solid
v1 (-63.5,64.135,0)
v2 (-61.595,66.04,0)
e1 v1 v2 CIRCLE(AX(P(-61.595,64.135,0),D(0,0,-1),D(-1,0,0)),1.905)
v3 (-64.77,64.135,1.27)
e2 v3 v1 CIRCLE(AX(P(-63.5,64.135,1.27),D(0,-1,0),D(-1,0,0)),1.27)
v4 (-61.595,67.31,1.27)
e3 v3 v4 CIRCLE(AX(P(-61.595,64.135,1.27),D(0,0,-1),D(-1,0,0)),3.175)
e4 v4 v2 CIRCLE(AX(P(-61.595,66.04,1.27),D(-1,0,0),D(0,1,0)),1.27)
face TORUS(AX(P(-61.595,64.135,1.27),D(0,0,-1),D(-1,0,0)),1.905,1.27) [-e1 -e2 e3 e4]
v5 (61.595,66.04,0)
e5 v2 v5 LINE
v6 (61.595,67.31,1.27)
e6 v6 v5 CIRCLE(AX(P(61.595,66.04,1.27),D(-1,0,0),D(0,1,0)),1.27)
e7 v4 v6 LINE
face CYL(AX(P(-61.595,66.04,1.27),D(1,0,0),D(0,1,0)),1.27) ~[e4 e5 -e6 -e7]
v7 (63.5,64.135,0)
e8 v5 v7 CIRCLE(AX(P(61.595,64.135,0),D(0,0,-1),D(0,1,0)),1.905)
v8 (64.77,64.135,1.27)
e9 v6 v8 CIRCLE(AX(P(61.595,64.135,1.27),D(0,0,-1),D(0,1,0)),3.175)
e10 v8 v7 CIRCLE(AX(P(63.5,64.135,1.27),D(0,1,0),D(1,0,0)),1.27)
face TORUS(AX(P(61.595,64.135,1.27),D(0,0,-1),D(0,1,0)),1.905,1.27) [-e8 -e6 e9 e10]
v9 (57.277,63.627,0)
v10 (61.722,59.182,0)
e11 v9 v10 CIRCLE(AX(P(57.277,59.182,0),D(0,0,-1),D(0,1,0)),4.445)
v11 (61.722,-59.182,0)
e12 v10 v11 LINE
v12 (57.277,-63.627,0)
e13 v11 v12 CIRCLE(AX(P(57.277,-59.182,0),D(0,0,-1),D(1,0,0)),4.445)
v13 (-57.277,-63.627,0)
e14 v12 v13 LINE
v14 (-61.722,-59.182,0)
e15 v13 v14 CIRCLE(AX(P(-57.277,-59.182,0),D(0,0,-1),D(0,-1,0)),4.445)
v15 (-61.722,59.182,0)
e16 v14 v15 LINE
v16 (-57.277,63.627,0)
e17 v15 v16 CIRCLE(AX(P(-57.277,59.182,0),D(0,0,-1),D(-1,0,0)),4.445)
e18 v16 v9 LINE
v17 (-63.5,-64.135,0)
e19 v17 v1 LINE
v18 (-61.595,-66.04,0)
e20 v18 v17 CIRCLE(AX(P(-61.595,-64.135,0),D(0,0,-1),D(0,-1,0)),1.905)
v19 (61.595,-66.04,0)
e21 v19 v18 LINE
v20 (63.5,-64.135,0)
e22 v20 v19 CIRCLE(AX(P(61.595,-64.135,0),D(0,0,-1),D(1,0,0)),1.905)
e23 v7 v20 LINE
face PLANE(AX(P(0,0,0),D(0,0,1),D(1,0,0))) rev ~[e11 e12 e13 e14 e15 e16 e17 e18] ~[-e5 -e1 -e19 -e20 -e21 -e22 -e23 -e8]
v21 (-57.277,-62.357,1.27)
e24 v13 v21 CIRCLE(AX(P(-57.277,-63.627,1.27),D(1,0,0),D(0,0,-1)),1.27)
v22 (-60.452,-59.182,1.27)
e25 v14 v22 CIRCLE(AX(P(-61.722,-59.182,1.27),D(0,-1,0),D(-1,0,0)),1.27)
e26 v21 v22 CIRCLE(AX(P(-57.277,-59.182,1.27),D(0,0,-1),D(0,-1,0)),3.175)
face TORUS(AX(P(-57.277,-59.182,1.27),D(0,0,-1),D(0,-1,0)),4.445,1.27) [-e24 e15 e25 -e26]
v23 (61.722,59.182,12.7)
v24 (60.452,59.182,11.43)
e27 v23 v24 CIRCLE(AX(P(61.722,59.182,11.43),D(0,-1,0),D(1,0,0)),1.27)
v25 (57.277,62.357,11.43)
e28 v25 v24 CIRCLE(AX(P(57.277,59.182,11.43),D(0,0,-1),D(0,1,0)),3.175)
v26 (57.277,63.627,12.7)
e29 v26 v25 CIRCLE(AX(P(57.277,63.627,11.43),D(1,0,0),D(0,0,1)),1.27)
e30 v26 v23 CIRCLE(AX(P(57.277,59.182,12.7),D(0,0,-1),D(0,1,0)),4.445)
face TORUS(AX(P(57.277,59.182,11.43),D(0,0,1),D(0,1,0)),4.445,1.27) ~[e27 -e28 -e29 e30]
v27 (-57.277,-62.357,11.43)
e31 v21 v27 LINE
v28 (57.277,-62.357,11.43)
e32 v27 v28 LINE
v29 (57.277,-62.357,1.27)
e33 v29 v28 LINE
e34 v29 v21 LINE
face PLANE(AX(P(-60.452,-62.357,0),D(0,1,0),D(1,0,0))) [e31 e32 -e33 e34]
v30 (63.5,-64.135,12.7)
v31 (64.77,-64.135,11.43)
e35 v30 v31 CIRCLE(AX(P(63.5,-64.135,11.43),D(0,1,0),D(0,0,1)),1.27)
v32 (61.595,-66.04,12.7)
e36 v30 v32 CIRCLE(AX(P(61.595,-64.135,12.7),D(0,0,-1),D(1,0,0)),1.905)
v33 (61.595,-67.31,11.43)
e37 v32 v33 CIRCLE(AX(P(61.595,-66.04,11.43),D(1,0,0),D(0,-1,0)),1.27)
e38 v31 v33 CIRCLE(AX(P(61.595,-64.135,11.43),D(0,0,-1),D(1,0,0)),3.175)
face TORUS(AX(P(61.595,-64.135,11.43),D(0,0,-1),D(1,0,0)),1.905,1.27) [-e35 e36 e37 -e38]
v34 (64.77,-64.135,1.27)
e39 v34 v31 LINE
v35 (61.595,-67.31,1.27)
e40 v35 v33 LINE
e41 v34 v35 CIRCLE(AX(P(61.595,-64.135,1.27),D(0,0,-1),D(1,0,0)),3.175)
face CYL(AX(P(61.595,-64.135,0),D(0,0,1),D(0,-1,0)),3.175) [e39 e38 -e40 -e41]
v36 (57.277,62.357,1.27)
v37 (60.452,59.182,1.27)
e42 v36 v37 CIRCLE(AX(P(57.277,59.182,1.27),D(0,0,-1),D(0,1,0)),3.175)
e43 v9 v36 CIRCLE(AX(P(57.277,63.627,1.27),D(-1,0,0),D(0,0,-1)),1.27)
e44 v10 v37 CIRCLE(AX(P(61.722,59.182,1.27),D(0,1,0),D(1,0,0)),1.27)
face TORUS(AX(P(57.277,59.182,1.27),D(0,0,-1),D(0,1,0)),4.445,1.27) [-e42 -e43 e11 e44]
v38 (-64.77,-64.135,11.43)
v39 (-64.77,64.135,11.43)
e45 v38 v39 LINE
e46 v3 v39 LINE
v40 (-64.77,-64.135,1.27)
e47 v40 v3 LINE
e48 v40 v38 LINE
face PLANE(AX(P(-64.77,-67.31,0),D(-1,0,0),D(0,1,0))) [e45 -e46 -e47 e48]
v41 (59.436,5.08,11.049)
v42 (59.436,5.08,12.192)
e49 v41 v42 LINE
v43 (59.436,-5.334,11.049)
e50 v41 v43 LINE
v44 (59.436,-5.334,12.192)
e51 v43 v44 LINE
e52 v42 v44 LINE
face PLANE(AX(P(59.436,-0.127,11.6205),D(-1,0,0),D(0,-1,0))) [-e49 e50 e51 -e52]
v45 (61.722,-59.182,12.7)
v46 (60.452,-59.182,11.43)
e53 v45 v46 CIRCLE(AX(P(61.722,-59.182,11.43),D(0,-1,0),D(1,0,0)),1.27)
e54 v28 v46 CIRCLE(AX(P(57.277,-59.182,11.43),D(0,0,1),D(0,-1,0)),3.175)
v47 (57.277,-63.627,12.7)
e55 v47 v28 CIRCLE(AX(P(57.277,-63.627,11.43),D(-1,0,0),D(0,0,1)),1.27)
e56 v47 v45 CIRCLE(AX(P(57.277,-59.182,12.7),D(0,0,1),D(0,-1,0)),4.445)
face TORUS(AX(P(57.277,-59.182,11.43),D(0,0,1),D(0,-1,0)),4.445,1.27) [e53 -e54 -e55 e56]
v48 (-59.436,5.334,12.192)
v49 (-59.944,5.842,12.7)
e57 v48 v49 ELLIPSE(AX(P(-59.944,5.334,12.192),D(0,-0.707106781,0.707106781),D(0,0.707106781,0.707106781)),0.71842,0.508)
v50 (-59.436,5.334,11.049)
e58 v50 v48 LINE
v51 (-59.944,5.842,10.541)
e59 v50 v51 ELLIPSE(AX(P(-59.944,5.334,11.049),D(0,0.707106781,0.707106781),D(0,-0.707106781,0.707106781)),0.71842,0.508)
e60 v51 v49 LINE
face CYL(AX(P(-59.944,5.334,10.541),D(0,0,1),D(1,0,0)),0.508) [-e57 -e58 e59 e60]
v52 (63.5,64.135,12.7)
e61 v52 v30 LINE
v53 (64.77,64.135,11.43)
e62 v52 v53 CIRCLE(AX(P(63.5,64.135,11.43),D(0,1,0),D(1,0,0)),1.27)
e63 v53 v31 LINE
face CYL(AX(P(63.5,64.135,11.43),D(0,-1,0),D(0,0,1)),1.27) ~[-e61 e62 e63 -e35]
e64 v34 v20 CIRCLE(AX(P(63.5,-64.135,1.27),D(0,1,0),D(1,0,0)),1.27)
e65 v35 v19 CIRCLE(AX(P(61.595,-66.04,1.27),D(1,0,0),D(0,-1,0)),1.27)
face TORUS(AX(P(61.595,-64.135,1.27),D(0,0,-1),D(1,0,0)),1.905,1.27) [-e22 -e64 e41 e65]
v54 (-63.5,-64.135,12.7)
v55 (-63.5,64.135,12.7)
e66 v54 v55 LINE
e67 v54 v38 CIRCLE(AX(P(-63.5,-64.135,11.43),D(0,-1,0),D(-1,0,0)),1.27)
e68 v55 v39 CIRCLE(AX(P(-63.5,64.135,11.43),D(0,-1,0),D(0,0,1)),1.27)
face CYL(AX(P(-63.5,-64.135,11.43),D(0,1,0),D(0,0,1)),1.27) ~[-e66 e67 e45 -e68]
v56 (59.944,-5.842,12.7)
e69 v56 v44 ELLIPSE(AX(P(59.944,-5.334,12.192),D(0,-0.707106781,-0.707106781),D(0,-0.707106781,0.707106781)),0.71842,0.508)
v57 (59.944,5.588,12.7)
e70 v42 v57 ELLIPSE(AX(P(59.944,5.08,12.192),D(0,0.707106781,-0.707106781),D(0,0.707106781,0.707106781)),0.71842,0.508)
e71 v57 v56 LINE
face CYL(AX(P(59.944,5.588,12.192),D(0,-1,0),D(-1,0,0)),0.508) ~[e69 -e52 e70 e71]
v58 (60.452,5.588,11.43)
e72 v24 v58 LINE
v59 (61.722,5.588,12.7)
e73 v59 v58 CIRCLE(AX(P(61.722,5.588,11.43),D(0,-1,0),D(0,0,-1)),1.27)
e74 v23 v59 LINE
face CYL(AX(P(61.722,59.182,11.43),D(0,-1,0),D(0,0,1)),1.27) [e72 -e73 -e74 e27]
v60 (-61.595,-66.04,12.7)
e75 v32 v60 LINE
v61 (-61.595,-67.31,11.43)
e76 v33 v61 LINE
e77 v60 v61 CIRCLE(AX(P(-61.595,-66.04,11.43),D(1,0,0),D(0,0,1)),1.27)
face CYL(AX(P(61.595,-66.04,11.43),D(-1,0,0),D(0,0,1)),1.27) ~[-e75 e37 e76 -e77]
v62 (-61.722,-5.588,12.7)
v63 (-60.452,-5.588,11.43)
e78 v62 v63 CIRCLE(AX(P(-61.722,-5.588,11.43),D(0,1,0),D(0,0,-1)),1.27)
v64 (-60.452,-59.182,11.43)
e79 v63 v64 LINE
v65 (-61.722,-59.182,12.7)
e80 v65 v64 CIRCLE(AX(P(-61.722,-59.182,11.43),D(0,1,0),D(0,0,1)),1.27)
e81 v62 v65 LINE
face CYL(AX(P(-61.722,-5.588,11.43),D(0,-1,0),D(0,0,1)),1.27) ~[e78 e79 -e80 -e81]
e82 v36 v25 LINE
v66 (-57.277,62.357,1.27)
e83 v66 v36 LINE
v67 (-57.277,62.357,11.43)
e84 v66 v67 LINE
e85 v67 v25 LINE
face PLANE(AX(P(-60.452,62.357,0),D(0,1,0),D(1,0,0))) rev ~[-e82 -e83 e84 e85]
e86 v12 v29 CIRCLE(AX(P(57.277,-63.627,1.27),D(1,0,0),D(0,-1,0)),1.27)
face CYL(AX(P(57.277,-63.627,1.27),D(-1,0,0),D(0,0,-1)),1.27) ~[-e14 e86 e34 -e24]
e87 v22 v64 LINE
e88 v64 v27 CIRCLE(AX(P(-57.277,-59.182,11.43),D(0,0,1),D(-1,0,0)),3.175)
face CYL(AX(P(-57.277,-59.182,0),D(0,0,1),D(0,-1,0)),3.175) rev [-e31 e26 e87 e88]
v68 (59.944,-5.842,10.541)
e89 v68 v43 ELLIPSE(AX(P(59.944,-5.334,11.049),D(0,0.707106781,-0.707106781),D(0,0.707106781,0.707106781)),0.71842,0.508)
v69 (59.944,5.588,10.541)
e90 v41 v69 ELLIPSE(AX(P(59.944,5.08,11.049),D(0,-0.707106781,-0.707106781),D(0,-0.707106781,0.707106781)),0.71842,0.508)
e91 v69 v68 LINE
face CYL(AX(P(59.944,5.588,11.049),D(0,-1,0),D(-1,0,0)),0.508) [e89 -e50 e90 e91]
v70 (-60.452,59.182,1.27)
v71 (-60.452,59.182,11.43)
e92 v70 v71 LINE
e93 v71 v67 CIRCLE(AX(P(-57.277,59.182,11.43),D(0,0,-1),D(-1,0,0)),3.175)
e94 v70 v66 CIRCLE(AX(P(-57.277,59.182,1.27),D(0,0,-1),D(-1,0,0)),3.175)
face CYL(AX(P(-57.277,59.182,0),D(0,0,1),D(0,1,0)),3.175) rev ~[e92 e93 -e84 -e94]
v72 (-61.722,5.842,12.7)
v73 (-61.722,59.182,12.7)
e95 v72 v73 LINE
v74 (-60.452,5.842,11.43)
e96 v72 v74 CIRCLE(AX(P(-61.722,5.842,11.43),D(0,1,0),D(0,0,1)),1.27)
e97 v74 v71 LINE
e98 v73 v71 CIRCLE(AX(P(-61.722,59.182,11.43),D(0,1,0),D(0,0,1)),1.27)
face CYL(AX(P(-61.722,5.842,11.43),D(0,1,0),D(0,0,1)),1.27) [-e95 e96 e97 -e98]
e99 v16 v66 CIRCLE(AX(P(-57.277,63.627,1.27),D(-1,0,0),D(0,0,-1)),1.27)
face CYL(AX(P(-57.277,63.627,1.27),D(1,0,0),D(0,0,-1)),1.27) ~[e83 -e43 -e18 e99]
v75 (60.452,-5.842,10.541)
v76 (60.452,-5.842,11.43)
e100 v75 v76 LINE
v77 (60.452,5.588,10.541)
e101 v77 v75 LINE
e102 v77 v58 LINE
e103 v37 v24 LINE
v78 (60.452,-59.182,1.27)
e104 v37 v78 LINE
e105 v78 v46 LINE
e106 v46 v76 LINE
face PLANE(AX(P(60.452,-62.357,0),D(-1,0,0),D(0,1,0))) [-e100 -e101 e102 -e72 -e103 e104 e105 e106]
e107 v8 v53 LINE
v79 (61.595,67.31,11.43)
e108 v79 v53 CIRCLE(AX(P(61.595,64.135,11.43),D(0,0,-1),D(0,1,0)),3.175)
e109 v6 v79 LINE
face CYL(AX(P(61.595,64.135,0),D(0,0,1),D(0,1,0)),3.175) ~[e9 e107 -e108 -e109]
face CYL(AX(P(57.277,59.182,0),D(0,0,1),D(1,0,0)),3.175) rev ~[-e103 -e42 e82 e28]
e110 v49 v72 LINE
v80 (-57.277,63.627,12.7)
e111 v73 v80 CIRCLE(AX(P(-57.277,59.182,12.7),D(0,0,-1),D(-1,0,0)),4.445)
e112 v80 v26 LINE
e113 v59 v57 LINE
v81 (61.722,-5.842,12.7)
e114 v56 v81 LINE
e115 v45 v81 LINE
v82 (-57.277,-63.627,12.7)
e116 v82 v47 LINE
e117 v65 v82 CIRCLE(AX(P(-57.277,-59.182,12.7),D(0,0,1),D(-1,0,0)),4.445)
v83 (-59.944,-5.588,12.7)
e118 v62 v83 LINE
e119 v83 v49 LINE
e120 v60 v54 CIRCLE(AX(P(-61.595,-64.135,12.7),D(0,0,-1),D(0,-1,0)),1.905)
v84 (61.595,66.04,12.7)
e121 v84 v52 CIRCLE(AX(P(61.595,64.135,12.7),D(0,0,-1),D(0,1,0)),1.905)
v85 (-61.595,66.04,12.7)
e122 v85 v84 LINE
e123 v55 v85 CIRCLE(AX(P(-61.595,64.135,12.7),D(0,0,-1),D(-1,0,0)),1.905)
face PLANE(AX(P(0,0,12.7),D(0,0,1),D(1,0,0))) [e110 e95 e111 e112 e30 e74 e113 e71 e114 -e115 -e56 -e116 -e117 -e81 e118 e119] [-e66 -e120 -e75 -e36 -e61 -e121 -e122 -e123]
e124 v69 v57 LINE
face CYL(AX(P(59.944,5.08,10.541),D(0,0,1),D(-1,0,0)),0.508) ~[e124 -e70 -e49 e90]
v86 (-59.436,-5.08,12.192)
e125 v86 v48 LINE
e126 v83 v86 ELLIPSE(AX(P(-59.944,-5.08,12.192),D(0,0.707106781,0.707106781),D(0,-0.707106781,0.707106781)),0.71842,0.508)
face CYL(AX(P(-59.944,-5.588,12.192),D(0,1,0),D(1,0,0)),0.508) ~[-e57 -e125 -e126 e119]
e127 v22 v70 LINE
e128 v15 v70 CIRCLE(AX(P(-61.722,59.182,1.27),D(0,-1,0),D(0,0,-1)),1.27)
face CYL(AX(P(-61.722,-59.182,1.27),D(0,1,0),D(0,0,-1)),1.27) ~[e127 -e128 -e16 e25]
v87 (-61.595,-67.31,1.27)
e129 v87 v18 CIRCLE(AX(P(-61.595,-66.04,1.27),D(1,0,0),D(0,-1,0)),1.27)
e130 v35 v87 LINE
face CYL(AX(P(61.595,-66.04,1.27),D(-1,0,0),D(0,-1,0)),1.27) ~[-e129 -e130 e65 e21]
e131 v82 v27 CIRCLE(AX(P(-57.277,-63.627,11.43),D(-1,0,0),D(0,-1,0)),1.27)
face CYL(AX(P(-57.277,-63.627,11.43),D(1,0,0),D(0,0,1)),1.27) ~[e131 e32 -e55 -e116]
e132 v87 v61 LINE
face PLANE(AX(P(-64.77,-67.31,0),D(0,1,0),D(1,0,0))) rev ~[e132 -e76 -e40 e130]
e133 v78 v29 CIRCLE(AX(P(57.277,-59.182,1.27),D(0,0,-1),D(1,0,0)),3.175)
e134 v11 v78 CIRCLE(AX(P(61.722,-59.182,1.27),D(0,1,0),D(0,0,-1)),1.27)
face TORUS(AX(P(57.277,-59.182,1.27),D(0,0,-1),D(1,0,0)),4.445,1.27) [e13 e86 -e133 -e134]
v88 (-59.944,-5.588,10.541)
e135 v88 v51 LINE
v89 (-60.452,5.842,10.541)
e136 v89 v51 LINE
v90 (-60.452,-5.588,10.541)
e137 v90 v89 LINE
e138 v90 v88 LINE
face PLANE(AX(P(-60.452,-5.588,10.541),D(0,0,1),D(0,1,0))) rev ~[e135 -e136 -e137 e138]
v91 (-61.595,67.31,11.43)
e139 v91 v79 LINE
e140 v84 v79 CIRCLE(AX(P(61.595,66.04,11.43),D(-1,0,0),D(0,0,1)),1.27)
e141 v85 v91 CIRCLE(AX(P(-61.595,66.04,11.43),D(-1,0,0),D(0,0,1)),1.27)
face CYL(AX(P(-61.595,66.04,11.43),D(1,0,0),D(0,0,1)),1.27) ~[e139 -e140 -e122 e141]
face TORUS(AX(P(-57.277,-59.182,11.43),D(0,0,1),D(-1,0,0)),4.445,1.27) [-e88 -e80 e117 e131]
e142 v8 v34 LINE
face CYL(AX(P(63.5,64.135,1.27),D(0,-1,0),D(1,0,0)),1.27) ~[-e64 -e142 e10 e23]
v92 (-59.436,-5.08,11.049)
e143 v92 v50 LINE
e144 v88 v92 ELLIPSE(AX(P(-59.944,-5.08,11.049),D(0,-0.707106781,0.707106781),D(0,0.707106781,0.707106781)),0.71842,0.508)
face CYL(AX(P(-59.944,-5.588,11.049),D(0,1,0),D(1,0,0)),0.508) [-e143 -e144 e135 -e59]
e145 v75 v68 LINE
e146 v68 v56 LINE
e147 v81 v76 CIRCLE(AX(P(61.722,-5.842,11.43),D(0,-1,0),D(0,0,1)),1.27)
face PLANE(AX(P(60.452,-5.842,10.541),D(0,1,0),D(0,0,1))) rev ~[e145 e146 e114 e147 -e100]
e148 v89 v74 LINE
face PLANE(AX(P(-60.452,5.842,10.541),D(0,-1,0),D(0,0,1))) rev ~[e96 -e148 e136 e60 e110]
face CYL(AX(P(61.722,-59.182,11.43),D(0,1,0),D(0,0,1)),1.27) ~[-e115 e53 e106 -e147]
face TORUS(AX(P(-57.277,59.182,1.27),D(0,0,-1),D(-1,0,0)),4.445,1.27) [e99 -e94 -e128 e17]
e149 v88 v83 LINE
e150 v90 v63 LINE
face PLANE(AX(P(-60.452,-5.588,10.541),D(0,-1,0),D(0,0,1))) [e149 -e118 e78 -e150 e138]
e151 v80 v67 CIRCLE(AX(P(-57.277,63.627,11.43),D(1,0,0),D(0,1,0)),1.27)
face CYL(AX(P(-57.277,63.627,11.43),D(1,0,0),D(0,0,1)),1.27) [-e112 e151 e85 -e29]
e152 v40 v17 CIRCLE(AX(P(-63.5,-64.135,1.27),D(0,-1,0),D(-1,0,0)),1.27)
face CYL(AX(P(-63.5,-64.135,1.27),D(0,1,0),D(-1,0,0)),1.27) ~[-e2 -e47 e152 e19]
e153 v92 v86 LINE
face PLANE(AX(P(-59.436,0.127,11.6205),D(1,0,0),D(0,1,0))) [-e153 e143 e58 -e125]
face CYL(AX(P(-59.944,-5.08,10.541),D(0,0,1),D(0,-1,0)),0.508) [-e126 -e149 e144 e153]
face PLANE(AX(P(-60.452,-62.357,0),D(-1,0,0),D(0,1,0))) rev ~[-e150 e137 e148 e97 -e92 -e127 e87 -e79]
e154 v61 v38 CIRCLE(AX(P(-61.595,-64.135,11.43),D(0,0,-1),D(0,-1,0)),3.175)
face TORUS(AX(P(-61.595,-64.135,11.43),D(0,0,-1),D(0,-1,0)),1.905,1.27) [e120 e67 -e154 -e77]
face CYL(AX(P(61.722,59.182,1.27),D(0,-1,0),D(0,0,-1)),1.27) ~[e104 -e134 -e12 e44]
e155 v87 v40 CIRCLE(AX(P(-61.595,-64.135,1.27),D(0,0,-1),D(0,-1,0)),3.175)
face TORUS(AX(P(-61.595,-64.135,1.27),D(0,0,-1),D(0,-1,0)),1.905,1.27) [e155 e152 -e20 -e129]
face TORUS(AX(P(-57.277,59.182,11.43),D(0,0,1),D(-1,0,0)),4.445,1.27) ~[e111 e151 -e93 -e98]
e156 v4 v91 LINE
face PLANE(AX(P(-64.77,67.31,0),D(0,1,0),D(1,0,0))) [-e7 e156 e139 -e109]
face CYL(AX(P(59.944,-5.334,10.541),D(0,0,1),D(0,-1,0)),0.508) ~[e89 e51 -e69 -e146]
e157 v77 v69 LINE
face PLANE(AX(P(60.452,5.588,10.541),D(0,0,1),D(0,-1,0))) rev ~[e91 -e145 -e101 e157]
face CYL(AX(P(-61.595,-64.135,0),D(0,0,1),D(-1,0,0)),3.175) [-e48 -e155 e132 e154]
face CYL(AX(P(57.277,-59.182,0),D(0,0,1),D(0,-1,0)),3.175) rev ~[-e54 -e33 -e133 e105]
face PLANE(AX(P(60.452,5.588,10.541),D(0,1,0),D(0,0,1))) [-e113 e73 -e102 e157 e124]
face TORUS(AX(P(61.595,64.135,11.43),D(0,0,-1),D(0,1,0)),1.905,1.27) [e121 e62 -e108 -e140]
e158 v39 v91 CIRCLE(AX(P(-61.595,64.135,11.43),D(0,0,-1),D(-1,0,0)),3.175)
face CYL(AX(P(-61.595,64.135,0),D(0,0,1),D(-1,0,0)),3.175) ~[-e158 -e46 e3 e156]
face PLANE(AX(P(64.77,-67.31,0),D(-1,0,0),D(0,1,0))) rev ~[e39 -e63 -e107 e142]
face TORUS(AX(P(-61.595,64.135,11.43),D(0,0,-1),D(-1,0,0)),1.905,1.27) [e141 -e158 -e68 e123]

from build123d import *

# Parameters (mm, degrees)
F0_W     = 129.54
F0_H     = 134.62
F0_W_2   = 120.904
F0_H_2   = 124.714
F1_DEPTH = 12.7
F2_R     = 3.175
F4_W     = 11.43
F4_H     = 2.159
F5_DEPTH = 1.016
F3_W     = 11.43
F3_H     = 2.159
F6_DEPTH = 1.016
F7_R     = 1.27
F8_R     = 0.508
F10_R    = 1.27


with BuildPart() as f1:
    # F0 (on Top) → F1 (new body)
    with BuildSketch(Plane.XY):
        Rectangle(F0_W, F0_H)
        Rectangle(F0_W_2, F0_H_2, mode=Mode.SUBTRACT)
    extrude(amount=F1_DEPTH)

    # F2
    f2_edges = [f1.edges().sort_by_distance(p)[0] for p in [
        (-60.452, 62.357, 6.35),
        (-60.452, -62.357, 6.35),
        (60.452, 62.357, 6.35),
        (60.452, -62.357, 6.35),
        (-64.77, 67.31, 6.35),
        (64.77, 67.31, 6.35),
        (-64.77, -67.31, 6.35),
        (64.77, -67.31, 6.35),
    ]]
    fillet(f2_edges, radius=F2_R)

    # F4 (on face) → F5 (join)
    with BuildSketch(Plane(origin=(60.452, 0, 0), x_dir=(0, -1, 0), z_dir=(-1, 0, 0))):
        with Locations((0.127, 11.6205)):
            Rectangle(F4_W, F4_H)
    extrude(amount=F5_DEPTH)

    # F3 (on face) → F6 (join)
    with BuildSketch(Plane.YZ.offset(-60.452)):
        with Locations((0.127, 11.6205)):
            Rectangle(F3_W, F3_H)
    extrude(amount=F6_DEPTH)

    # F7
    f7_edges = [f1.edges().sort_by_distance(p)[0] for p in [
        (0, -62.357, 12.7),
        (0, 62.357, 0),
        (-64.77, 0, 0),
        (-60.452, 32.512, 12.7),
    ]]
    fillet(f7_edges, radius=F7_R)

    # F8
    f8_edges = [f1.edges().sort_by_distance(p)[0] for p in [
        (-59.436, 5.842, 11.6205),
        (-59.436, -5.588, 11.6205),
        (-59.436, 0.127, 10.541),
        (-59.436, 0.127, 12.7),
        (59.436, 5.588, 11.6205),
        (59.436, -5.842, 11.6205),
        (59.436, -0.127, 12.7),
        (59.436, -0.127, 10.541),
    ]]
    fillet(f8_edges, radius=F8_R)

    # F10
    f10_edges = [f1.edges().sort_by_distance(p)[0] for p in [
        (0, 67.31, 12.7),
        (-63.840064, 66.380064, 12.7),
        (-64.77, 0, 12.7),
        (-63.840064, -66.380064, 12.7),
        (0, -67.31, 12.7),
        (63.840064, -66.380064, 12.7),
        (64.77, 0, 12.7),
        (63.840064, 66.380064, 12.7),
    ]]
    fillet(f10_edges, radius=F10_R)


solid = f1.part
